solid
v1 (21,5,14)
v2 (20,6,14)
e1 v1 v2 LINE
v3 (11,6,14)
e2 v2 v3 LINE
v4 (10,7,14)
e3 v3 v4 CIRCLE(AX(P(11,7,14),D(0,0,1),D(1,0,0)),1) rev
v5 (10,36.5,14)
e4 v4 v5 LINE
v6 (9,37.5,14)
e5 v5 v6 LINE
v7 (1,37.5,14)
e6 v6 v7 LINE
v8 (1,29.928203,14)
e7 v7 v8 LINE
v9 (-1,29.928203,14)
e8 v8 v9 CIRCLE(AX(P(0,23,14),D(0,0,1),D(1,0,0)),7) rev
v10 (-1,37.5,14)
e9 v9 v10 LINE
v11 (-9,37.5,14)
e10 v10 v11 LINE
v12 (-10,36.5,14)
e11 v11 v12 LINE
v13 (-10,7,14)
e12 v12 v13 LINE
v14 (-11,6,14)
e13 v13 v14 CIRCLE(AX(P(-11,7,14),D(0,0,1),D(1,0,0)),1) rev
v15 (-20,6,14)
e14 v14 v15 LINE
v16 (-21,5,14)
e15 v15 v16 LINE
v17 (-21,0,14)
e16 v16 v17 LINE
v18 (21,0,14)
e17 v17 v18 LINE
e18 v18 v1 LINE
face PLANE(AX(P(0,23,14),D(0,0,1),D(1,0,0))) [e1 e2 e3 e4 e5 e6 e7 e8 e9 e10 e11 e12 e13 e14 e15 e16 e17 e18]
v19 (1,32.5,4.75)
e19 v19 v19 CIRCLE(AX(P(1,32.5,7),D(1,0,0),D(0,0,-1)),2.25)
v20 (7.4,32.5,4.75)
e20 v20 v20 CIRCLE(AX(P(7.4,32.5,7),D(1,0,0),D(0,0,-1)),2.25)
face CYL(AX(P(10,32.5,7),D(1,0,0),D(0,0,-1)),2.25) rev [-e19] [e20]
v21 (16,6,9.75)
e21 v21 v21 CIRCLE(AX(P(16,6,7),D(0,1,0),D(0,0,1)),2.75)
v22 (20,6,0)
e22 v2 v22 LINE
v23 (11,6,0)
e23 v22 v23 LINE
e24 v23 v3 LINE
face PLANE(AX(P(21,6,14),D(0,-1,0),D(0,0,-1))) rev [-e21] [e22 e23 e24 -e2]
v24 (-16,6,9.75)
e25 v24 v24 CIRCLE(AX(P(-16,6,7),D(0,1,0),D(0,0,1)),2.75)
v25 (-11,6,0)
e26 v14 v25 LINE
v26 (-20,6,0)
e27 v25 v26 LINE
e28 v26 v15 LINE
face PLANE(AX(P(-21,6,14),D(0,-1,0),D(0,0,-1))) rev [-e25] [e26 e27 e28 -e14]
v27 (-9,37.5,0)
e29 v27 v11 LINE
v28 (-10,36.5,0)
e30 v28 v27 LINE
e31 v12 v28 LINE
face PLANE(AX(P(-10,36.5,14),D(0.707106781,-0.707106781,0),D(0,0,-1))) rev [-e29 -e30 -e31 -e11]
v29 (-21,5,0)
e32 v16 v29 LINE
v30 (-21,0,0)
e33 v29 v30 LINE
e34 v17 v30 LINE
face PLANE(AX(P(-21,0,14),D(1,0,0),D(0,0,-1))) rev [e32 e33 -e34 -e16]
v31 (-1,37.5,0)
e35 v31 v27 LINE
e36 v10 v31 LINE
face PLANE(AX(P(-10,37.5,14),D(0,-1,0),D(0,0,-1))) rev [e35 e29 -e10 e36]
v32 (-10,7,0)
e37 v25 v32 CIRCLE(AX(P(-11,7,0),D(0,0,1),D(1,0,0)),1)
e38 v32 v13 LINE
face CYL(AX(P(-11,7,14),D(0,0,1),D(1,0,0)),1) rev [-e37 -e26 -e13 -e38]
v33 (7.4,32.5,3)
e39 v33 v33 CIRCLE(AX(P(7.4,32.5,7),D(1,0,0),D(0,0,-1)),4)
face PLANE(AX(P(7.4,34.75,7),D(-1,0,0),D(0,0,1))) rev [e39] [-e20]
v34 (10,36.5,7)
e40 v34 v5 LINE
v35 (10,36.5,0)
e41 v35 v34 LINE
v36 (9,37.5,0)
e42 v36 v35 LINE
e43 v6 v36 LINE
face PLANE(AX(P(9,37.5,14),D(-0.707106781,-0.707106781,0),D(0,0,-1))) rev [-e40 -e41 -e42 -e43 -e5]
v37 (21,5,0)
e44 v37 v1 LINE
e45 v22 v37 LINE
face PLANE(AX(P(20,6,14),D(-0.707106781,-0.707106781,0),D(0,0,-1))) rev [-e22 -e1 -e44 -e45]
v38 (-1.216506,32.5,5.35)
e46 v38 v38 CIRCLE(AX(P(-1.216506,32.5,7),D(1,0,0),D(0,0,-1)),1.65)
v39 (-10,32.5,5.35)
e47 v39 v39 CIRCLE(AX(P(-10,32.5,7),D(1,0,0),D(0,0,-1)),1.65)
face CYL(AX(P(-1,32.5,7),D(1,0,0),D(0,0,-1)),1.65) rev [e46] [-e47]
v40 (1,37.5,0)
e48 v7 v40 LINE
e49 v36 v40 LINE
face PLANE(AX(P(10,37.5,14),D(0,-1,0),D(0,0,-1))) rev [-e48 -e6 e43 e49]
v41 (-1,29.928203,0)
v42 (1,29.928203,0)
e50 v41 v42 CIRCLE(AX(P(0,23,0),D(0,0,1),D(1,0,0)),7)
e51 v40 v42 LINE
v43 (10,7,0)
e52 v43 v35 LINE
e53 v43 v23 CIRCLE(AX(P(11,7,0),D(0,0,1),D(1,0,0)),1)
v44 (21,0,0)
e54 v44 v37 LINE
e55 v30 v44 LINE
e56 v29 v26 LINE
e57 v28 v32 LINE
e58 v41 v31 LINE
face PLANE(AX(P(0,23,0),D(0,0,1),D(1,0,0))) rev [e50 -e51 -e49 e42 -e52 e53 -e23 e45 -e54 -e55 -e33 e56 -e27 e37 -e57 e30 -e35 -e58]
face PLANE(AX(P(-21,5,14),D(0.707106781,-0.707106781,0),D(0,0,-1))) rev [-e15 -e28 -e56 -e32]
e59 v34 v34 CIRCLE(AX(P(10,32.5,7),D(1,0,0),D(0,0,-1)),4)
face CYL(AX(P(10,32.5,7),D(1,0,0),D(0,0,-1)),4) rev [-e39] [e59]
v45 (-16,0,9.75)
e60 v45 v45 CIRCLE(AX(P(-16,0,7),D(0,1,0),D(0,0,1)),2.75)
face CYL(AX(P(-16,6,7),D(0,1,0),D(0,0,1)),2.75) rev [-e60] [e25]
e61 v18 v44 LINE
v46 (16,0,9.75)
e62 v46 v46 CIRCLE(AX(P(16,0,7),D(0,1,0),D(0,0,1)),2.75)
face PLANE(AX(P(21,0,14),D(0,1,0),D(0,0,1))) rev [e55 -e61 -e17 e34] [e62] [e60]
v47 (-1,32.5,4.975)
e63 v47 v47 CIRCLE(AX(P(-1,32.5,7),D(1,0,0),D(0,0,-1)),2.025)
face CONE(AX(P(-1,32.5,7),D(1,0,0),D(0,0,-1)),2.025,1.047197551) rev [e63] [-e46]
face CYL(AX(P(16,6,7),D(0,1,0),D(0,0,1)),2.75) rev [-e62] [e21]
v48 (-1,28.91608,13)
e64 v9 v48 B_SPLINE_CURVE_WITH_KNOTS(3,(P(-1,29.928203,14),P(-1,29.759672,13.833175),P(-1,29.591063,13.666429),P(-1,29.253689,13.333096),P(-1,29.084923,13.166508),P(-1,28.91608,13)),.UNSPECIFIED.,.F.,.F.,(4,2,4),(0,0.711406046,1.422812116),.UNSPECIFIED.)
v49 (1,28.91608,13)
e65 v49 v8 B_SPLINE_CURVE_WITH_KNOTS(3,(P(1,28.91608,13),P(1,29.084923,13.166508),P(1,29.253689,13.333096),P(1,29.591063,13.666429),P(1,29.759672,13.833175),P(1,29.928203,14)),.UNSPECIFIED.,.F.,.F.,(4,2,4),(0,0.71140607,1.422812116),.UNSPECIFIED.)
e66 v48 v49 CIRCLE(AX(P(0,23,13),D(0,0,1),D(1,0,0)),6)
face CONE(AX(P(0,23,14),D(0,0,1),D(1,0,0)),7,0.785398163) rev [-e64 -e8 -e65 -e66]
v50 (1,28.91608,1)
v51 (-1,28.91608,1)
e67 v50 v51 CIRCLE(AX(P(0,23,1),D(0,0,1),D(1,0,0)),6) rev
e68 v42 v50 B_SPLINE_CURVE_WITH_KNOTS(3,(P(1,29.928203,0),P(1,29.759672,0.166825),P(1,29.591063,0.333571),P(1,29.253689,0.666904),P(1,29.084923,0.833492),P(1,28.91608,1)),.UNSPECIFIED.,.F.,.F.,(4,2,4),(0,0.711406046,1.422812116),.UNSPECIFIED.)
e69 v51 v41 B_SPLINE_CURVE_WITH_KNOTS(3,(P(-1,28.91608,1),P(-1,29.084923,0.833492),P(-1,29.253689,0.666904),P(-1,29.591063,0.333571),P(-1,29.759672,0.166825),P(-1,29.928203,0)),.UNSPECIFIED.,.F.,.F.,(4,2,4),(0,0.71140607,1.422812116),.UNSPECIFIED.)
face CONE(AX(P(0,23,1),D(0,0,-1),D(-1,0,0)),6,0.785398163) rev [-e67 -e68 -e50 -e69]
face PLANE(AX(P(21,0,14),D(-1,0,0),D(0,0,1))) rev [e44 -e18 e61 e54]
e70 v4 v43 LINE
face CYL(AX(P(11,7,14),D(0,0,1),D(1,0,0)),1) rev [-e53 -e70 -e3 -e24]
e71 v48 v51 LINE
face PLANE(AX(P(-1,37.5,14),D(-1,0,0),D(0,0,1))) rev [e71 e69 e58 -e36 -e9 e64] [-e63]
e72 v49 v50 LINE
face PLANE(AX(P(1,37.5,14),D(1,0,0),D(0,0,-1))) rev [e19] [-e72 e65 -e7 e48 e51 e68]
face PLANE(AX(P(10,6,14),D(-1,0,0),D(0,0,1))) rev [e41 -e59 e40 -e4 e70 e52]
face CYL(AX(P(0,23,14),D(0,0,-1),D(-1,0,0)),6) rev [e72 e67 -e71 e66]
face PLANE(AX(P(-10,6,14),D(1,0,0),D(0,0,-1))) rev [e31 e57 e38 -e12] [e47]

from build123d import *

# Parameters (mm, degrees)
ESTRUSIONE_ESTRUSIONE2_DEPTH                         = 14
FORO_5_5_5_5_3_D                                     = 5.5
FORO_LAMATO_PER_VITE_M4_A_TESTA_CILINDRI_D           = 4.5
FORO_LAMATO_PER_VITE_M4_A_TESTA_CILINDRI_DEPTH       = 9
FORO_LAMATO_PER_VITE_M4_A_TESTA_CILINDRI_CBORE_D     = 8
FORO_LAMATO_PER_VITE_M4_A_TESTA_CILINDRI_CBORE_DEPTH = 2.6
FORO_FILETTATO_M4_1_D                                = 3.3
FORO_FILETTATO_M4_1_CSINK_D                          = 4.05
FORO_FILETTATO_M4_1_CSINK_ANGLE                      = 120
RACCORDO1_R                                          = 1
SMUSSO1_SIZE                                         = 1


with BuildPart() as part:
    # Schizzo10 → Estrusione-Estrusione2 (new body)
    with BuildSketch(Plane.XY):
        with BuildLine():
            Line((21, 0), (-21, 0))
            Line((-21, 0), (-21, 6))
            Line((-21, 6), (-10, 6))
            Line((-10, 6), (-10, 37.5))
            Line((-10, 37.5), (-1, 37.5))
            Line((-1, 37.5), (-1, 28.916079783))
            ThreePointArc((-1, 28.916079783), (0, 17), (1, 28.916079783))
            Line((1, 28.916079783), (1, 37.5))
            Line((1, 37.5), (10, 37.5))
            Line((10, 37.5), (10, 6))
            Line((10, 6), (21, 6))
            Line((21, 6), (21, 0))
        make_face()
    extrude(amount=ESTRUSIONE_ESTRUSIONE2_DEPTH)

    # Foro Ø5.5 (5.5)-3 (through all)
    with Locations(Plane(origin=(0, 6, 0), x_dir=(1, 0, 0), z_dir=(0, 1, 0))):
        with Locations((-16, -7), (16, -7)):
            Hole(FORO_5_5_5_5_3_D / 2)

    # Foro lamato per Vite M4 a testa cilindrica piana-1
    with Locations(Plane(origin=(10, 0, 0), x_dir=(0, 0, -1), z_dir=(1, 0, 0))):
        with Locations((-7, 32.5)):
            CounterBoreHole(FORO_LAMATO_PER_VITE_M4_A_TESTA_CILINDRI_D / 2, FORO_LAMATO_PER_VITE_M4_A_TESTA_CILINDRI_CBORE_D / 2, FORO_LAMATO_PER_VITE_M4_A_TESTA_CILINDRI_CBORE_DEPTH, depth=FORO_LAMATO_PER_VITE_M4_A_TESTA_CILINDRI_DEPTH)

    # Foro filettato M4-1 (through all)
    with Locations(Plane(origin=(-1, 0, 0), x_dir=(0, 0, -1), z_dir=(1, 0, 0))):
        with Locations((-7, 32.5)):
            CounterSinkHole(FORO_FILETTATO_M4_1_D / 2, FORO_FILETTATO_M4_1_CSINK_D / 2, counter_sink_angle=FORO_FILETTATO_M4_1_CSINK_ANGLE)

    # Raccordo1
    raccordo1_edges = [part.edges().sort_by_distance(p)[0] for p in [
        (10, 6, 7),
        (-10, 6, 7),
    ]]
    fillet(raccordo1_edges, radius=RACCORDO1_R)

    # Smusso1
    smusso1_edges = [part.edges().sort_by_distance(p)[0] for p in [
        (0, 17, 0),
        (10, 37.5, 7),
        (21, 6, 7),
        (-21, 6, 7),
        (-10, 37.5, 7),
        (0, 17, 14),
    ]]
    chamfer(smusso1_edges, length=SMUSSO1_SIZE - 0.0001)  # a hair under: the kernel refuses the full size


solid = part.part
